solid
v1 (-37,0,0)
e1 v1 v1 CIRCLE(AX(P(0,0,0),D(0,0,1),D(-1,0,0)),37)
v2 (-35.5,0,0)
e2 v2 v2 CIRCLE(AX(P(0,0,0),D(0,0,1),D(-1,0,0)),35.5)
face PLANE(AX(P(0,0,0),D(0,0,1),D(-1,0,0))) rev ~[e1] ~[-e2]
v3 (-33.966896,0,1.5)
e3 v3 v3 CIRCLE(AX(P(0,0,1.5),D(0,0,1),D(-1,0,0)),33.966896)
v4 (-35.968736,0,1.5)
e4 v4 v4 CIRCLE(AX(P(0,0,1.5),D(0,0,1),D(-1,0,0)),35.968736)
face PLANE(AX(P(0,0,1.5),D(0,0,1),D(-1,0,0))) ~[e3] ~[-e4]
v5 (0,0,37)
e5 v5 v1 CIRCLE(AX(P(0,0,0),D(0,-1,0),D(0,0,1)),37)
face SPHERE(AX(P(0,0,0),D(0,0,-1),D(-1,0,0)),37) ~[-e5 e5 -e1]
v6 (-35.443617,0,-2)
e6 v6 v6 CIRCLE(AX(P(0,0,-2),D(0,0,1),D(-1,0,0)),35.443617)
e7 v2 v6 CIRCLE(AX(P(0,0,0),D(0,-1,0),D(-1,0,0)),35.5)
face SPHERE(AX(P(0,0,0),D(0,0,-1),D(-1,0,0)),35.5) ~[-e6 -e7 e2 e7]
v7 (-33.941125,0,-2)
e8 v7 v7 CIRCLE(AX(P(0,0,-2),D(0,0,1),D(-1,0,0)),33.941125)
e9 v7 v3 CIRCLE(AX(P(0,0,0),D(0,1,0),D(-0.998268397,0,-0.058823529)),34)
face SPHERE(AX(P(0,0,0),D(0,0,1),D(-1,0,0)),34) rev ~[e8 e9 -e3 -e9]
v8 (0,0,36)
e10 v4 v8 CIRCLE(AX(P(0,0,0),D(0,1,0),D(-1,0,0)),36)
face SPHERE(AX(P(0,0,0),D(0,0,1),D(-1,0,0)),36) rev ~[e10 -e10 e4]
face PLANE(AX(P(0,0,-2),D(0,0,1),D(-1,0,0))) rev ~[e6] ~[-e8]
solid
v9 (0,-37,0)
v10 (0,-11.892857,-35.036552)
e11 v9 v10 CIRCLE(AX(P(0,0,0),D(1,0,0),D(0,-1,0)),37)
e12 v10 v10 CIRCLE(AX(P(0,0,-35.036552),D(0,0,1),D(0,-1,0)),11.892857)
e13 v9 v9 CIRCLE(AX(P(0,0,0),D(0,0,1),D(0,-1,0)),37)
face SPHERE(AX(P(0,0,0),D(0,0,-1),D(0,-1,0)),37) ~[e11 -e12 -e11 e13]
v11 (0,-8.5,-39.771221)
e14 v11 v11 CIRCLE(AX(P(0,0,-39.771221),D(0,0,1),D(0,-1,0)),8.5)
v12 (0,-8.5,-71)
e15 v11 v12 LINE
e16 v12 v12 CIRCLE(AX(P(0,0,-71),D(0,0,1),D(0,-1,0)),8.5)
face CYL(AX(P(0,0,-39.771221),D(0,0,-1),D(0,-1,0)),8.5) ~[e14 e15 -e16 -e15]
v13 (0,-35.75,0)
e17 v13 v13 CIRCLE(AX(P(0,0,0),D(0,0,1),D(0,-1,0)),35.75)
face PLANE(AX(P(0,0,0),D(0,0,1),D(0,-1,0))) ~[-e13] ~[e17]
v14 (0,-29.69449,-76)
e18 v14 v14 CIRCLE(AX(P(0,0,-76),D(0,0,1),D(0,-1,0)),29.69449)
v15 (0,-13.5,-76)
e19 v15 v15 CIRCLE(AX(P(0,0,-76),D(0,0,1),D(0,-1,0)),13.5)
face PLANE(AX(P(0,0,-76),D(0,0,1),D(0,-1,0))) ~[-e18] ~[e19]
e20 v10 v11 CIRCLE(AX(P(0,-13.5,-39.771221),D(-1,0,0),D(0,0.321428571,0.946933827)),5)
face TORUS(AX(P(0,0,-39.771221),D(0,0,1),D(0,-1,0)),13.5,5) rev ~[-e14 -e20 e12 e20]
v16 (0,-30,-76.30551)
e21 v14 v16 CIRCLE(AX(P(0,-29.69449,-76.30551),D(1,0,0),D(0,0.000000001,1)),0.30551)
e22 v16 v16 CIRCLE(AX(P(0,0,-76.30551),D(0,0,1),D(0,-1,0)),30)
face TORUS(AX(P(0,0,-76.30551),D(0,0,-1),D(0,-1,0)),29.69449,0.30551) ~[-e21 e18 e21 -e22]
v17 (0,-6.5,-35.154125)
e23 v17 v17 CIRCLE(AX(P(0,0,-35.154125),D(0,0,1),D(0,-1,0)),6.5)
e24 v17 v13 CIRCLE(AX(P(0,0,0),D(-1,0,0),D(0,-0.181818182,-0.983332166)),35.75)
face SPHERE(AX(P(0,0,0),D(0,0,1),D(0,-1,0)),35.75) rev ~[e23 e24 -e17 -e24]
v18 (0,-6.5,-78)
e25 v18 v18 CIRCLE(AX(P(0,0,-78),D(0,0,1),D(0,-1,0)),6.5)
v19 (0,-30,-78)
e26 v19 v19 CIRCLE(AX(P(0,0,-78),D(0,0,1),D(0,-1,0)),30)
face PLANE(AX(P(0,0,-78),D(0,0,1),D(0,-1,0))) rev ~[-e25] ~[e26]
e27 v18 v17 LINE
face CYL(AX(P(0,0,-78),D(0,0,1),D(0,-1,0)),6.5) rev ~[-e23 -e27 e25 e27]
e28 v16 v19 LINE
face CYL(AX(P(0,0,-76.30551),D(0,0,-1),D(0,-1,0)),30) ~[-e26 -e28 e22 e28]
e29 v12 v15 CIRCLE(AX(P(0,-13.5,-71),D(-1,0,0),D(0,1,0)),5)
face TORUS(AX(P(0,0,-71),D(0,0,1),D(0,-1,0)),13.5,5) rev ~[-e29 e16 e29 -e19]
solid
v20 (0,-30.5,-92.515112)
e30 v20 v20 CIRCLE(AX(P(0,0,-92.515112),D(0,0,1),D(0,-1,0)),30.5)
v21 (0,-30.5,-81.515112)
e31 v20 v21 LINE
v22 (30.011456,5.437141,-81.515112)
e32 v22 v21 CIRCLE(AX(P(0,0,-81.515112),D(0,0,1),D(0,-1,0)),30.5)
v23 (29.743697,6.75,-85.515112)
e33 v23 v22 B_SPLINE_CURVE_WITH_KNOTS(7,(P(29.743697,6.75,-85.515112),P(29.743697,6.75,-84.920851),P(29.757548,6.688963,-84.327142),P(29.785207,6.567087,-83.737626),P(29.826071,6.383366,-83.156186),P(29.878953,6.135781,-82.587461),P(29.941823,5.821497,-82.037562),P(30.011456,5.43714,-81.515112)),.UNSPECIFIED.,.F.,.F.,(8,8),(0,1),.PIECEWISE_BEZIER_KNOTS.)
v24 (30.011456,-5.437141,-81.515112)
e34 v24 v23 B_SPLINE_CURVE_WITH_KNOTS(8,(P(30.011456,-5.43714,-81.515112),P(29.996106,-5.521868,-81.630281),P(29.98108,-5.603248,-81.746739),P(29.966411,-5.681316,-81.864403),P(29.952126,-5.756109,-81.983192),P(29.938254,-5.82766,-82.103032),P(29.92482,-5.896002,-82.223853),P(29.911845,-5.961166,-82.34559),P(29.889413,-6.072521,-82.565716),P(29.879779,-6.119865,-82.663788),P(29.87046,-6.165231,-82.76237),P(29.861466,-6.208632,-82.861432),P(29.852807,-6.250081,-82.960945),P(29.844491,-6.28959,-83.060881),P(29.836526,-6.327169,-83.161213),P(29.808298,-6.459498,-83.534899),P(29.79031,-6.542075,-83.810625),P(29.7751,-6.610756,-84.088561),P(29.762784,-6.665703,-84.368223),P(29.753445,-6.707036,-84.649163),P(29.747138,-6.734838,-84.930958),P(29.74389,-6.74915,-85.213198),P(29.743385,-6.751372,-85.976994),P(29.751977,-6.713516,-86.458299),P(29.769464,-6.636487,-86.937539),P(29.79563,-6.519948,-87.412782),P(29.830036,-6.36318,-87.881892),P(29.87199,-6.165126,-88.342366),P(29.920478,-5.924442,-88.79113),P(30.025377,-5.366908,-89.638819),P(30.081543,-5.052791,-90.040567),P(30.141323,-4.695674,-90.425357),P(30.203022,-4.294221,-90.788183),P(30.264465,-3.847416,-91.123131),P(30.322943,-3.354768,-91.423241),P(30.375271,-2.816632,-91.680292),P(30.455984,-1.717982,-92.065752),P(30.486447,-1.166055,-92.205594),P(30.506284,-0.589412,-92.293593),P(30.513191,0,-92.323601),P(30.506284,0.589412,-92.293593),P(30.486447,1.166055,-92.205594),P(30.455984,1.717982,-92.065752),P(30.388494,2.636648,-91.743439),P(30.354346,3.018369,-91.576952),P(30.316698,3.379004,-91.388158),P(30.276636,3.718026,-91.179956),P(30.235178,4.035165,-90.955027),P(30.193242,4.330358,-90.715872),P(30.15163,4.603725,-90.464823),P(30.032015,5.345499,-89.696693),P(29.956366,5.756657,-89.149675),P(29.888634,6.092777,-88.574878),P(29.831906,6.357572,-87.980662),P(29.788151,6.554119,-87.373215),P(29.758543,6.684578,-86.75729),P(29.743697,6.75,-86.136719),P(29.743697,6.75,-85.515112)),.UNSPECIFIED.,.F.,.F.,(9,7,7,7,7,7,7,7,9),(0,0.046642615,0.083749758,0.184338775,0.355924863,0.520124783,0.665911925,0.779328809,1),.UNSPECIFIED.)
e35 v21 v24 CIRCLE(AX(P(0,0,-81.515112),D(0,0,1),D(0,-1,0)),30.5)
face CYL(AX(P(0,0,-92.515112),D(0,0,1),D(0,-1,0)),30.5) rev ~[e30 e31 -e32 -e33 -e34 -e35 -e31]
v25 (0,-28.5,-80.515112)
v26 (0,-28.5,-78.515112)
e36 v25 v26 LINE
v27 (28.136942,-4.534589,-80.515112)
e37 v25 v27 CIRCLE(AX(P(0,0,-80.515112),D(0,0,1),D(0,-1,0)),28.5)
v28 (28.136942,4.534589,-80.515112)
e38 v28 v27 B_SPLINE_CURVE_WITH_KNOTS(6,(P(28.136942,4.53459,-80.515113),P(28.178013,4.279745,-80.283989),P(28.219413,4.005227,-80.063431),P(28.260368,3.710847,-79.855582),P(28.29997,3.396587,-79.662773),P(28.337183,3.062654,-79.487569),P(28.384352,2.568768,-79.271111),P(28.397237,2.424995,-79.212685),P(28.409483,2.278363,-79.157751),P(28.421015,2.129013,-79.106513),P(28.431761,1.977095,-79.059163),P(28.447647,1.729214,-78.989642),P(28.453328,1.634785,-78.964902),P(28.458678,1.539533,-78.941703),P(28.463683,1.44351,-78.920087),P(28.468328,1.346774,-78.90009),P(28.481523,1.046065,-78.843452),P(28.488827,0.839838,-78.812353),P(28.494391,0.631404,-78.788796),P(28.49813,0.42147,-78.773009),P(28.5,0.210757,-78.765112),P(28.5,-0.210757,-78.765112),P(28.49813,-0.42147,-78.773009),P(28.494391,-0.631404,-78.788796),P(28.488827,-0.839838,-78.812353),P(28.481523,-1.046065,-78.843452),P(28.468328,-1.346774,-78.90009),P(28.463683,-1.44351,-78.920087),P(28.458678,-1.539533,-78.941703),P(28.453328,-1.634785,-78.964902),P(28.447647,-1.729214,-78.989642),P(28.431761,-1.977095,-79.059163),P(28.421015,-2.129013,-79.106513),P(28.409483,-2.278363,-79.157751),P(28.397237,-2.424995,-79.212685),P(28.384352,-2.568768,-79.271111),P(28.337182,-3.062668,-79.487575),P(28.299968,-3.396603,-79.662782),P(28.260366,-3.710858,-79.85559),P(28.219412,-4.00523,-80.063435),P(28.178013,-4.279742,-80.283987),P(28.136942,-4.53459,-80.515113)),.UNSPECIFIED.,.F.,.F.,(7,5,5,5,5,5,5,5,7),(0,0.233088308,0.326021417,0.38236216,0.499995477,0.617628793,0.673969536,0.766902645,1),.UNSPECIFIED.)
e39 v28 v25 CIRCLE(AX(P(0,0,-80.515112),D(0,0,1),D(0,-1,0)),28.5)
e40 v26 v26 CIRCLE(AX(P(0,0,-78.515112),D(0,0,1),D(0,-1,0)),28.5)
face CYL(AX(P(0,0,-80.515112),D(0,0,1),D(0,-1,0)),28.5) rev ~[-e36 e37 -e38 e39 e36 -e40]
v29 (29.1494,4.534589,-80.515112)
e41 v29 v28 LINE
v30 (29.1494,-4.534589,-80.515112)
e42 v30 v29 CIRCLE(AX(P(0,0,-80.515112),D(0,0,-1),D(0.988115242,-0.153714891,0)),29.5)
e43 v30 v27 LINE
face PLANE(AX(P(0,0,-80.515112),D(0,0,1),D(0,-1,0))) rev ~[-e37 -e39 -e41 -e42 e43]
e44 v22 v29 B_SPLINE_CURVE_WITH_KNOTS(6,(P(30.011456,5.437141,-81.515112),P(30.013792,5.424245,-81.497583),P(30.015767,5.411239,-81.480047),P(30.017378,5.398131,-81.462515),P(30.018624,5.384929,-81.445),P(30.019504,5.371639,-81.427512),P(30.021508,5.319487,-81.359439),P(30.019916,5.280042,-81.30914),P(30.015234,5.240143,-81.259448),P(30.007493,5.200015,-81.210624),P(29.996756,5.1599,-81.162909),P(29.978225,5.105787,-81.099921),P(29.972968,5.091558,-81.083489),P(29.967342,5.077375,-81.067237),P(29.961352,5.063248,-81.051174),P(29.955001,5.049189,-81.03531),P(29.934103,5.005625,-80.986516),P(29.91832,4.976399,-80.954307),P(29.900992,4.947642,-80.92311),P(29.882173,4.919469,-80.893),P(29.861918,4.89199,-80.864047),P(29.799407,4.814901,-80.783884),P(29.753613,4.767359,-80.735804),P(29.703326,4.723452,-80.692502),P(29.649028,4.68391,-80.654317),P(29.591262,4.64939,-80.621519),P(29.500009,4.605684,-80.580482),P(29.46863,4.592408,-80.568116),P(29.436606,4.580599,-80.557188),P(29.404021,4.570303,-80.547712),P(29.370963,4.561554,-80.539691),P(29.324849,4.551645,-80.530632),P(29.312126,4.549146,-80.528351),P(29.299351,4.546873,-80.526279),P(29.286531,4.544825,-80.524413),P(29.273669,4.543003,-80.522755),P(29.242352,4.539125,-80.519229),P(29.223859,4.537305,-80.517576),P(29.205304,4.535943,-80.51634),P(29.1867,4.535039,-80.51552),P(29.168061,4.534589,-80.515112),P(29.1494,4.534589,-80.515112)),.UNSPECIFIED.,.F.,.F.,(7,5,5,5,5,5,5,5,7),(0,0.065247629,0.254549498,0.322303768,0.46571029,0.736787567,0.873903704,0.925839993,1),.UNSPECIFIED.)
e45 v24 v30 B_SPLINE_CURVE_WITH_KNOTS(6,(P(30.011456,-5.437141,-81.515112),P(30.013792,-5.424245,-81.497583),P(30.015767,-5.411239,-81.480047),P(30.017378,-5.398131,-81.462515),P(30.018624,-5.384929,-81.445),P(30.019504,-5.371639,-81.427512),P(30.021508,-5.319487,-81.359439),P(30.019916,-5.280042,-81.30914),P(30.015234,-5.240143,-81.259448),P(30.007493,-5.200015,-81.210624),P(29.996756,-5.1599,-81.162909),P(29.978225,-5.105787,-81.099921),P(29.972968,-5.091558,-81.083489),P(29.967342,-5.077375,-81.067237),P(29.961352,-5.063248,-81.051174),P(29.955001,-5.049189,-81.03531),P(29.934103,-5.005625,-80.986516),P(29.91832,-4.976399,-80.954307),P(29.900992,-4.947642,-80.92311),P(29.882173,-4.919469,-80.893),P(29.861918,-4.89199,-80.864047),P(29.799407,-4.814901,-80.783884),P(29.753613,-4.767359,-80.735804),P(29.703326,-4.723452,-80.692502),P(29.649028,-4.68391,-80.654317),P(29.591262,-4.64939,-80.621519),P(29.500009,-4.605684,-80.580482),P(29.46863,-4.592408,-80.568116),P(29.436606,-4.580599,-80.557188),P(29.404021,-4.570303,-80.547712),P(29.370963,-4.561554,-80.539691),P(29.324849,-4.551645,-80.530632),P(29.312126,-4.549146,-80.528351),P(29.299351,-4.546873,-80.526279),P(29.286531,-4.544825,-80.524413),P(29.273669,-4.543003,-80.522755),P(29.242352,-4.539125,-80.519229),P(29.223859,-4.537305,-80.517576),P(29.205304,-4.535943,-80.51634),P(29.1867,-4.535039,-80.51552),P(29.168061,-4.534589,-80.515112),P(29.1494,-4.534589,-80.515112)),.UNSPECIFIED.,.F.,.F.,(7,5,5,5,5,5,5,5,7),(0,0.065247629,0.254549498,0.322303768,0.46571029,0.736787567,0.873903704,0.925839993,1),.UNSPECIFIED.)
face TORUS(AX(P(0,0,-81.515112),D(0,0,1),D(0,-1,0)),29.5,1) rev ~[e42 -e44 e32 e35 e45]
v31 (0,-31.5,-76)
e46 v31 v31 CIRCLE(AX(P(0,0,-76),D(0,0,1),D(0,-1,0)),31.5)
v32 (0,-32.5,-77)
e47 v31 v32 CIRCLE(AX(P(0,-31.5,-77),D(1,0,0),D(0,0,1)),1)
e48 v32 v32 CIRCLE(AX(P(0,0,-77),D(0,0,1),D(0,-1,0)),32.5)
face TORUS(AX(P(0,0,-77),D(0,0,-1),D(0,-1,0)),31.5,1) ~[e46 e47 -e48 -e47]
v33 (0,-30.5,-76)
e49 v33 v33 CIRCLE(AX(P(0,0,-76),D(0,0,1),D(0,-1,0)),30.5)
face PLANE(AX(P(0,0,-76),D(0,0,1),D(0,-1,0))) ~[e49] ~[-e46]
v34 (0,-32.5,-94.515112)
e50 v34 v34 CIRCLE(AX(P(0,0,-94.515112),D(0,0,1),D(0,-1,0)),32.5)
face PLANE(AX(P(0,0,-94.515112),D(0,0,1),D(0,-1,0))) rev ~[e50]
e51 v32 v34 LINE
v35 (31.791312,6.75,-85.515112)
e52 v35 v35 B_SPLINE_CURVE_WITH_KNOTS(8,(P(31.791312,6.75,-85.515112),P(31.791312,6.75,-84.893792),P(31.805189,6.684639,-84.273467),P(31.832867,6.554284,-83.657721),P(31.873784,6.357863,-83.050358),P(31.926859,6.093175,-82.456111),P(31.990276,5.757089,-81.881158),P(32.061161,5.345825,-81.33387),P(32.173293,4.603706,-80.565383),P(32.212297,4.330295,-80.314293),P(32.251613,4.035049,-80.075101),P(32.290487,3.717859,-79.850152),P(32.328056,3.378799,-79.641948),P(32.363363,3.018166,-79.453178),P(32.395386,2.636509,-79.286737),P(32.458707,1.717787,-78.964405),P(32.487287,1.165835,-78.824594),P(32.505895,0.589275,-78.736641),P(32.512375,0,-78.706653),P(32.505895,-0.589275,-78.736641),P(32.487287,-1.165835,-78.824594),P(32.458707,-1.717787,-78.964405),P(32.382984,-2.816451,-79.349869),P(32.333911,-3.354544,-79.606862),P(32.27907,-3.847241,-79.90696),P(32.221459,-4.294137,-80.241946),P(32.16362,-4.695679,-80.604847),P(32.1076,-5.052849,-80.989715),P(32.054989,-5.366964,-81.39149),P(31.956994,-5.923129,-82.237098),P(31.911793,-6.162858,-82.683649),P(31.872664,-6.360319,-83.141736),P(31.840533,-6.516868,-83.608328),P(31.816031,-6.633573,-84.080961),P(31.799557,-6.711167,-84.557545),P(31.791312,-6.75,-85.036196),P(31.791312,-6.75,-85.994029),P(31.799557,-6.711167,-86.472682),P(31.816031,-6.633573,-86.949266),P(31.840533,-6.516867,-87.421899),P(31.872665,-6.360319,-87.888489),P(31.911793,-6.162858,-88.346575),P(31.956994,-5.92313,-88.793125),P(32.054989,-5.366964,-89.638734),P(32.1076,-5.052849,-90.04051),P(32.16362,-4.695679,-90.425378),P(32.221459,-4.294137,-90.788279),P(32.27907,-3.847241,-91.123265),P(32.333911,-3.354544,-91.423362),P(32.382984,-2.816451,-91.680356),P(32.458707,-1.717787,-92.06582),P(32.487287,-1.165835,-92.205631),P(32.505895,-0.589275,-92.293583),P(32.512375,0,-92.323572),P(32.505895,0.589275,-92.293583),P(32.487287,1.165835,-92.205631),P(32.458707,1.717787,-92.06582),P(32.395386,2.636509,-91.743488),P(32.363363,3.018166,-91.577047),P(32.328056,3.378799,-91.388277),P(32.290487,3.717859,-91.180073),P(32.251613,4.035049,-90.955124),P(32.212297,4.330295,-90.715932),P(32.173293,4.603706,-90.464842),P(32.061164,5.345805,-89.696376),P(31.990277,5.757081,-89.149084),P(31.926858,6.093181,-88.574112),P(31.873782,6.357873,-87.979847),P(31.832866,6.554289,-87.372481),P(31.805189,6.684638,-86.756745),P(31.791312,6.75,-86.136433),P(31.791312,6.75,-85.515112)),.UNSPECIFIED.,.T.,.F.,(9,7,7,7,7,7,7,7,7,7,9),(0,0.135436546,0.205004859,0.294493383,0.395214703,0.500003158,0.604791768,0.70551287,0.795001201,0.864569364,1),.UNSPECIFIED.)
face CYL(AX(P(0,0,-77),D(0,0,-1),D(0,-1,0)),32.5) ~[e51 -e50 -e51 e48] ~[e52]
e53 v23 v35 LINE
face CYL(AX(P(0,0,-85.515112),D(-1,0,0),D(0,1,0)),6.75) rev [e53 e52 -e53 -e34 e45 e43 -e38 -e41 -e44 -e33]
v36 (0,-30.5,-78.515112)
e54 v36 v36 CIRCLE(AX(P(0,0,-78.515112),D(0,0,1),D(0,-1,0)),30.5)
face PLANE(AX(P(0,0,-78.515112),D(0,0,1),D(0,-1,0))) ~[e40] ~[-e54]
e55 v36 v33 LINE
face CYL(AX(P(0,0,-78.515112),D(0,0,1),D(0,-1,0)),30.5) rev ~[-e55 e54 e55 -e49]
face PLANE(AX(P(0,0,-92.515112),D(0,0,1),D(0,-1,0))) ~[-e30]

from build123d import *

# Parameters (mm, degrees)
F7_R     = 6.75
F8_DEPTH = 50


with BuildPart() as f2:
    # F0 (on Right) → F2 (revolve)
    with BuildSketch(Plane.YZ):
        with BuildLine():
            ThreePointArc((-8.5, -71), (-9.9644660941, -74.5355339059), (-13.5, -76))
            Line((-13.5, -76), (-29.6944898516, -76))
            ThreePointArc((-29.6944898516, -76), (-29.9105181493, -76.0894818507), (-30, -76.3055101484))
            Line((-30, -76.3055101484), (-30, -78))
            Line((-30, -78), (-6.5, -78))
            Line((-6.5, -78), (-6.5, -76))
            Line((-6.5, -76), (-6.5, -75))
            Line((-6.5, -75), (-6.5, -36.588932753))
            Line((-6.5, -36.588932753), (-6.5, -35.1541249358))
            ThreePointArc((-6.5, -35.1541249358), (-27.4812436036, -22.8657768291), (-35.75, 0))
            Line((-35.75, 0), (-37, 0))
            ThreePointArc((-37, 0), (-30.07520336, -21.5518477829), (-11.8928571429, -35.0365516137))
            ThreePointArc((-11.8928571429, -35.0365516137), (-9.4357833297, -36.8588088881), (-8.5, -39.7712207507))
            Line((-8.5, -39.7712207507), (-8.5, -71))
        make_face()
    revolve(axis=Axis((0, 0, -37.5008806586), (0, 0, 1)))


with BuildPart() as f4:
    # F3 (on Front) → F4 (revolve)
    with BuildSketch(Plane.XZ):
        with BuildLine():
            Line((0, 36), (0, 37))
            ThreePointArc((0, 37), (-26.1629509039, 26.1629509039), (-37, 0))
            Line((-37, 0), (-36, 0))
            ThreePointArc((-36, 0), (-25.4558441227, 25.4558441227), (0, 36))
        make_face()
    revolve(axis=Axis((0, 0, 36.5), (0, 0, 1)))

    # F9 (on Front) → F10 (revolve)
    with BuildSketch(Plane.XZ):
        with BuildLine():
            Line((-36.1092984676, 0), (-35.5, 0))
            ThreePointArc((-35.5, 0), (-35.4859014997, -1.0003972986), (-35.4436171969, -2))
            Line((-35.4436171969, -2), (-33.941125497, -2))
            ThreePointArc((-33.941125497, -2), (-33.9990784283, -0.2503318301), (-33.9668956486, 1.5))
            Line((-33.9668956486, 1.5), (-36.1092984676, 1.5))
            Line((-36.1092984676, 1.5), (-36.1092984676, 0))
        make_face()
    revolve(axis=Axis((0, 0, -37.5008806586), (0, 0, 1)))


with BuildPart() as f6:
    # F5 (on Right) → F6 (revolve)
    with BuildSketch(Plane.YZ):
        with BuildLine():
            Line((-30.5, -78.5151124001), (-30.5, -76))
            Line((-30.5, -76), (-31.5, -76))
            ThreePointArc((-31.5, -76), (-32.2071067812, -76.2928932188), (-32.5, -77))
            Line((-32.5, -77), (-32.5, -92.5151124001))
            Line((-32.5, -92.5151124001), (-32.5, -94.5151124001))
            Line((-32.5, -94.5151124001), (0, -94.5151124001))
            Line((0, -94.5151124001), (0, -92.5151124001))
            Line((0, -92.5151124001), (-30.5, -92.5151124001))
            Line((-30.5, -92.5151124001), (-30.5, -81.5151124001))
            ThreePointArc((-30.5, -81.5151124001), (-30.2071067812, -80.8080056189), (-29.5, -80.5151124001))
            Line((-29.5, -80.5151124001), (-28.5, -80.5151124001))
            Line((-28.5, -80.5151124001), (-28.5, -78.5151124001))
            Line((-28.5, -78.5151124001), (-30.5, -78.5151124001))
        make_face()
    revolve(axis=Axis((0, 0, -93.5151124001), (0, 0, 1)))

    # F7 (on Right) → F8 (cut)
    with BuildSketch(Plane.YZ):
        with Locations((0, -85.5151124001)):
            Circle(F7_R)
    extrude(amount=F8_DEPTH, mode=Mode.SUBTRACT)


solid = Compound([f2.part, f4.part, f6.part])
